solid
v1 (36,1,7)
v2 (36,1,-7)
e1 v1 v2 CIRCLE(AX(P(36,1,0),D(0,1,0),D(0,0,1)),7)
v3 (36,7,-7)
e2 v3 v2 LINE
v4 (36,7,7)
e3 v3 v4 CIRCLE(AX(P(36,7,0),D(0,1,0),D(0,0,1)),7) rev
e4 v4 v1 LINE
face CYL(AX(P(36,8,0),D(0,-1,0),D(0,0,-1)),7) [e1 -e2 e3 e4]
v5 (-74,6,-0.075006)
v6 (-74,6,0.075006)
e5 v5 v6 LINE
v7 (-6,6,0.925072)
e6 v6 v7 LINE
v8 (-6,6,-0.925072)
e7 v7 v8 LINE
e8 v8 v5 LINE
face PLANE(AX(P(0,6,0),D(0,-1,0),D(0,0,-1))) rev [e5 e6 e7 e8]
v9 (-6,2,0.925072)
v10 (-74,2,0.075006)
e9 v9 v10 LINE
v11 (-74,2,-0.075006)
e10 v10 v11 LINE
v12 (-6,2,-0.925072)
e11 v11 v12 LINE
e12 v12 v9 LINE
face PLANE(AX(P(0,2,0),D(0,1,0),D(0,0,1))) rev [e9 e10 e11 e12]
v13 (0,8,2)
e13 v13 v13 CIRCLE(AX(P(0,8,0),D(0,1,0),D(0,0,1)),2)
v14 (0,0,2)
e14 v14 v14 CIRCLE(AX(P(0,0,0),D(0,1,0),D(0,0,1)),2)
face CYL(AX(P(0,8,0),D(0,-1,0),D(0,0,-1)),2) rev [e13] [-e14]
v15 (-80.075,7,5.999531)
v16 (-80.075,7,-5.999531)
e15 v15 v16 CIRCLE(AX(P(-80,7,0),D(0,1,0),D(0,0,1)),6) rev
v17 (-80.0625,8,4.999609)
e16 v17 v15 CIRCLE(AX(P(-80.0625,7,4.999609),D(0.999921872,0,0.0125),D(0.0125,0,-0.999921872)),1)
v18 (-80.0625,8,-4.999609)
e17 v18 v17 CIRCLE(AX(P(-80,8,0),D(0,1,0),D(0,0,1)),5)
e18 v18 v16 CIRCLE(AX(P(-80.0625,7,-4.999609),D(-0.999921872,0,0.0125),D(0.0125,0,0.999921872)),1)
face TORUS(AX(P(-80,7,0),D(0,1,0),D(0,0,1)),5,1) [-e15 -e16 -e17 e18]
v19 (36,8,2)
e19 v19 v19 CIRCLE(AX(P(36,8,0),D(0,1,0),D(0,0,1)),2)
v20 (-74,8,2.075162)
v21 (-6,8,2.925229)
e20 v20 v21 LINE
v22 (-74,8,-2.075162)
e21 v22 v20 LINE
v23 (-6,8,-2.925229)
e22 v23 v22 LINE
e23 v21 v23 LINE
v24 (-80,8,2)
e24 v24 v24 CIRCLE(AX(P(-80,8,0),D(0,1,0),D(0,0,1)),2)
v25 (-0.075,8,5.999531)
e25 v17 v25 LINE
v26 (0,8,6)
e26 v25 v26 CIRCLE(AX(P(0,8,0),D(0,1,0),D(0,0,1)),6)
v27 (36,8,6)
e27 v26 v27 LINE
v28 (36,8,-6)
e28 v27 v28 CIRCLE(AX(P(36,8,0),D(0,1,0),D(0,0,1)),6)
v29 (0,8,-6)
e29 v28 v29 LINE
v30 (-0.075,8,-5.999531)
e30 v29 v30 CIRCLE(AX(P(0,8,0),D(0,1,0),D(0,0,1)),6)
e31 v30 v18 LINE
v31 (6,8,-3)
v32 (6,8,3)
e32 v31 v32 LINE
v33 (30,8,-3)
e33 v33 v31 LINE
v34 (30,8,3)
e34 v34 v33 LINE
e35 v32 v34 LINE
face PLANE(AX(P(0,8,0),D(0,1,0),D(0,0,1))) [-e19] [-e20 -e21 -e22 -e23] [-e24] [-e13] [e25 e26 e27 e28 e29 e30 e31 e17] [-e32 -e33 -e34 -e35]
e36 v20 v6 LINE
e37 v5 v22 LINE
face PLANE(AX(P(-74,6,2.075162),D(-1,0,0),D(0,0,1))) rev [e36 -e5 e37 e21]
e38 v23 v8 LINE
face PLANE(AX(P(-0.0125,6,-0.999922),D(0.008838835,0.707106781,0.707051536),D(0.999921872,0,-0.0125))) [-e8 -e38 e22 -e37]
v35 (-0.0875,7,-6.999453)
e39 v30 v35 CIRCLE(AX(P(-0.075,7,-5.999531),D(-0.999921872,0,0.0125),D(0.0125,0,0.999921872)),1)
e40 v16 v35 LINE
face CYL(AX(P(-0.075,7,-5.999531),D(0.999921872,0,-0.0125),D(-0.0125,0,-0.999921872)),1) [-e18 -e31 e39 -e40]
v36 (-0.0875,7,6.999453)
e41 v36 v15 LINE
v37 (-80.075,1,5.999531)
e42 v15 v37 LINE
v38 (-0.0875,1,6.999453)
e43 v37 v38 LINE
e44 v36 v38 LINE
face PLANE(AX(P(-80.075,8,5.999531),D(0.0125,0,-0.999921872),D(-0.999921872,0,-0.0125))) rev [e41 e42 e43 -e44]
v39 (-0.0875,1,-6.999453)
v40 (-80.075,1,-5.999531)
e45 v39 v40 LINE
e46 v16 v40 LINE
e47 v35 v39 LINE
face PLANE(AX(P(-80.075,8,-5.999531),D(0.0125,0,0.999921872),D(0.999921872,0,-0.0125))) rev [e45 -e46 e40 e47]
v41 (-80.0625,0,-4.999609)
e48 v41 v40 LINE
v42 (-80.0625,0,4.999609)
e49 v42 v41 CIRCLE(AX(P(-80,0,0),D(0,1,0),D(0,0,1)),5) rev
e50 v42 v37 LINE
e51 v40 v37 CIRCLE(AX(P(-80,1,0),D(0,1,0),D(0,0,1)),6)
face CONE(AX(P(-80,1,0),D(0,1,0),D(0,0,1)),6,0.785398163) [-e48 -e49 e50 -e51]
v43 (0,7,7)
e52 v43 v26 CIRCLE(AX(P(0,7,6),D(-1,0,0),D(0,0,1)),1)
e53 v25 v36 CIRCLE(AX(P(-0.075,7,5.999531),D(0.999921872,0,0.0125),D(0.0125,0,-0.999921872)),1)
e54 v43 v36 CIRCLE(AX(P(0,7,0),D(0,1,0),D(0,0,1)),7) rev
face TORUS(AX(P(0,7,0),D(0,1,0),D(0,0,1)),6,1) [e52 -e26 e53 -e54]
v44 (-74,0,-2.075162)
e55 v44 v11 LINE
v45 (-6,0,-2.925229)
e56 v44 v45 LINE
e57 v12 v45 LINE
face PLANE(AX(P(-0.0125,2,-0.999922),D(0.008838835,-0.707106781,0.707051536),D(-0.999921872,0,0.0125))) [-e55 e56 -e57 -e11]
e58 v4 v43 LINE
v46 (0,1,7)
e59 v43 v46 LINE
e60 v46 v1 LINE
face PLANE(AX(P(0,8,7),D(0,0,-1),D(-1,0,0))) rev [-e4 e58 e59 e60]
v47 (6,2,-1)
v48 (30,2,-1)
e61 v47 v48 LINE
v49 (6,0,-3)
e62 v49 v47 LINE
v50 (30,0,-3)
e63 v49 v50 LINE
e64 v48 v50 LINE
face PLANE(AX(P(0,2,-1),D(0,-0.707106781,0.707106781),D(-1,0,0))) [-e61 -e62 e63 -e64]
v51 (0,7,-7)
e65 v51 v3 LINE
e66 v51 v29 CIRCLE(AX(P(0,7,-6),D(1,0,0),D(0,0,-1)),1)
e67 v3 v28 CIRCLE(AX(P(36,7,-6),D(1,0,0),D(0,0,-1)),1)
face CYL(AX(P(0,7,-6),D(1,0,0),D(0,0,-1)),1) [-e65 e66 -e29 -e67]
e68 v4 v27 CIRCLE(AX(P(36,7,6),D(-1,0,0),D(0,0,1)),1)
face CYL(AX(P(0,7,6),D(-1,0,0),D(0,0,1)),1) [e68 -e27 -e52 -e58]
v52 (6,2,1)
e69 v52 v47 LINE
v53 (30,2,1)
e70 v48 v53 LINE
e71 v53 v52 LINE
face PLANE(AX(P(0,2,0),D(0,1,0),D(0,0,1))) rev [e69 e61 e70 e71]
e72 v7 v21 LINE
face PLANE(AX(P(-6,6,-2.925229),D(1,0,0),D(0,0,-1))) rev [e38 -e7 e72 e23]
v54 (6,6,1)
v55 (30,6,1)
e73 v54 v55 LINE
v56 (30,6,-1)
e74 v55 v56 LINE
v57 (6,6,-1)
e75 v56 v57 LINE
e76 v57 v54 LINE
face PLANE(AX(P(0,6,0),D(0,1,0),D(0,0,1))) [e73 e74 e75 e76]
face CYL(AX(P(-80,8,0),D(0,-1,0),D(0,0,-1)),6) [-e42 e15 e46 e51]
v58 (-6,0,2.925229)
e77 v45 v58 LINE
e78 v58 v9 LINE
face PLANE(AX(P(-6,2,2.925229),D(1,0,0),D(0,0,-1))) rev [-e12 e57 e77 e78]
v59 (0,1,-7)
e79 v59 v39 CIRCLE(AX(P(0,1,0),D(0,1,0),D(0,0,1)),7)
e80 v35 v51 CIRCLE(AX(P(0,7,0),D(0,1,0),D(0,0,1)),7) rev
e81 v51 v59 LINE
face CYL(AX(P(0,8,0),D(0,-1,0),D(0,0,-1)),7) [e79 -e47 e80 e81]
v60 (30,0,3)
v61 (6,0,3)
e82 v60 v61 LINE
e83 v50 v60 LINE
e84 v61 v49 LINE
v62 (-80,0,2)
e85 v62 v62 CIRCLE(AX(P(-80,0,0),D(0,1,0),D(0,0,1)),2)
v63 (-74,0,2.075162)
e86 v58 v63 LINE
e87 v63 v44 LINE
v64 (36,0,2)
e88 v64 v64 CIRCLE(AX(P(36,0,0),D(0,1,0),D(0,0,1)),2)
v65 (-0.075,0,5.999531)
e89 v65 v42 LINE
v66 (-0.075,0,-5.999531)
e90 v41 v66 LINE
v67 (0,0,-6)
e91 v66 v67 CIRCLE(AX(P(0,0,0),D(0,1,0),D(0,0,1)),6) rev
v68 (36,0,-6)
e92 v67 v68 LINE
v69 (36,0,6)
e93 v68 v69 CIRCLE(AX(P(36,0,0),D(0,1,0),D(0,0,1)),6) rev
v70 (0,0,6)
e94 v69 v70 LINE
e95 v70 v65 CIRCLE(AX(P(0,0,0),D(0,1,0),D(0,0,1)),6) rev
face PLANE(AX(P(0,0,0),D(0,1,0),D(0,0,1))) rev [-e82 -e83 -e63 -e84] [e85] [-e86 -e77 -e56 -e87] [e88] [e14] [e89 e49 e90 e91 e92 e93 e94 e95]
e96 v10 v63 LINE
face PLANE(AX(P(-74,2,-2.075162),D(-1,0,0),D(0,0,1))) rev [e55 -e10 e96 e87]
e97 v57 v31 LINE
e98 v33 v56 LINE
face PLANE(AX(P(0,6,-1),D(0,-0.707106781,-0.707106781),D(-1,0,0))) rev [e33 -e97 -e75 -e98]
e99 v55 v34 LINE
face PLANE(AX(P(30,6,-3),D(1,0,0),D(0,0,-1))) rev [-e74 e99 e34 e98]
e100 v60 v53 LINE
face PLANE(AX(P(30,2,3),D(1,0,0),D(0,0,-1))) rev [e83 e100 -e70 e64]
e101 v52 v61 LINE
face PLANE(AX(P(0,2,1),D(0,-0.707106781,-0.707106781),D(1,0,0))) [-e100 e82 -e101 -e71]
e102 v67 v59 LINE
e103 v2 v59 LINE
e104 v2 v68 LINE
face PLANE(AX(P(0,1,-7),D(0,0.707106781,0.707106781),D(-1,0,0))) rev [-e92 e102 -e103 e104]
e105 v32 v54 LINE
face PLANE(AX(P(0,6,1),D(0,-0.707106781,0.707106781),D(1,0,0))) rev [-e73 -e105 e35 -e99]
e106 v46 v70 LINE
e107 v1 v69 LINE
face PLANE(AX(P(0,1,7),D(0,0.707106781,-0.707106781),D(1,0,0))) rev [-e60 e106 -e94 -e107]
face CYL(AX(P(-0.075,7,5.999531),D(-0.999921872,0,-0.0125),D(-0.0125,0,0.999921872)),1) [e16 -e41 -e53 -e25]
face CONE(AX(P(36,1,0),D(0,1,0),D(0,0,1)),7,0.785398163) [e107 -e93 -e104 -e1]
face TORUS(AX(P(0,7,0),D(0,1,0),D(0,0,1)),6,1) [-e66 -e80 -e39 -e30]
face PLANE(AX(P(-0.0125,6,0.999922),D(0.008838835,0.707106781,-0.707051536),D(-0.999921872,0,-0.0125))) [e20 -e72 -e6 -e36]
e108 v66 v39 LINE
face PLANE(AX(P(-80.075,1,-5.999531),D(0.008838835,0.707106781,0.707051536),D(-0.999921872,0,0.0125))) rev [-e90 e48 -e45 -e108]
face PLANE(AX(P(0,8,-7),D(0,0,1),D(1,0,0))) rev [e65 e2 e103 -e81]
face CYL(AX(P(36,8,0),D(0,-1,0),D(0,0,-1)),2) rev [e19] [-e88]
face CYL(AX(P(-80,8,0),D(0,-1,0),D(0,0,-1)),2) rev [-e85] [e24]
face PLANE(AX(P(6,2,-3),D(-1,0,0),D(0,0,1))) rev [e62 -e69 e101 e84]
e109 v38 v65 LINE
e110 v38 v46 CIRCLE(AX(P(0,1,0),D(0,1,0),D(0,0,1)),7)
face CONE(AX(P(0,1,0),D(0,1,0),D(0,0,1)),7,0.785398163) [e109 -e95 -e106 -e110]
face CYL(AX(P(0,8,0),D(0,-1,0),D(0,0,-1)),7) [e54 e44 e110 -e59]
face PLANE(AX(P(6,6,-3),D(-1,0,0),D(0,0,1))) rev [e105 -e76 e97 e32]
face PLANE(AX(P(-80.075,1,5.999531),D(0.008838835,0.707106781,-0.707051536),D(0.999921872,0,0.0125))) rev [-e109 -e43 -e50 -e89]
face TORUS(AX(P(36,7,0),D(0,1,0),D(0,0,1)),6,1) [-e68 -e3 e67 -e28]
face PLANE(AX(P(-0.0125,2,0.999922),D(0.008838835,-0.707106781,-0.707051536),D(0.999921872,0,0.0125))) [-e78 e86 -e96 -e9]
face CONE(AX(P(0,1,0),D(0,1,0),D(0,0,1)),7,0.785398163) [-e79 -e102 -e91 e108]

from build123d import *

# Parameters (mm, degrees)
SKETCH1_R           = 2
BOSS_EXTRUDE1_DEPTH = 8
SKETCH2_W           = 24
SKETCH2_H           = 6
CUT_EXTRUDE1_DEPTH  = 2
SKETCH3_W           = 24
SKETCH3_H           = 6
CUT_EXTRUDE2_DEPTH  = 2
FILLET2_R           = 1
CHAMFER1_SIZE       = 1
CHAMFER2_SIZE       = 2
CHAMFER3_SIZE       = 2
CHAMFER5_SIZE       = 2
CHAMFER6_SIZE       = 2
CHAMFER7_SIZE       = 2
CHAMFER8_SIZE       = 2
CHAMFER9_SIZE       = 2
CHAMFER10_SIZE      = 2


with BuildPart() as part:
    # Sketch1 → Boss-Extrude1 (new body)
    with BuildSketch(Plane(origin=(0, 0, 0), x_dir=(1, 0, 0), z_dir=(0, 1, 0))):
        with BuildLine():
            Line((0, 7), (36, 7))
            ThreePointArc((36, 7), (43, 0), (36, -7))
            Line((36, -7), (0, -7))
            ThreePointArc((0, -7), (-0.043750855, -6.999863275), (-0.0875, -6.999453104))
            Line((-0.0875, -6.999453104), (-80.075, -5.999531232))
            ThreePointArc((-80.075, -5.999531232), (-86, 0), (-80.075, 5.999531232))
            Line((-80.075, 5.999531232), (-0.0875, 6.999453104))
            ThreePointArc((-0.0875, 6.999453104), (-0.043750855, 6.999863275), (0, 7))
        make_face()
        with Locations(Location((0, 0, 0), (0, 0, 270))):
            Circle(SKETCH1_R, mode=Mode.SUBTRACT)
        with Locations(Location((-80, 0, 0), (0, 0, 270))):
            Circle(SKETCH1_R, mode=Mode.SUBTRACT)
        with Locations(Location((36, 0, 0), (0, 0, 270))):
            Circle(SKETCH1_R, mode=Mode.SUBTRACT)
    extrude(amount=BOSS_EXTRUDE1_DEPTH)

    # Sketch2 → Cut-Extrude1 (cut)
    with BuildSketch(Plane(origin=(0, 8, 0), x_dir=(1, 0, 0), z_dir=(0, 1, 0))):
        Polygon((-74, 2.075162128), (-6, 2.925228542), (-6, -2.925228542), (-74, -2.075162128), align=None)
        with Locations((18, 0)):
            Rectangle(SKETCH2_W, SKETCH2_H)
    extrude(amount=-CUT_EXTRUDE1_DEPTH, mode=Mode.SUBTRACT)

    # Sketch3 → Cut-Extrude2 (cut)
    with BuildSketch(Plane.XZ):
        Polygon((-74, 2.075162128), (-6, 2.925228542), (-6, -2.925228542), (-74, -2.075162128), align=None)
        with Locations((18, 0)):
            Rectangle(SKETCH3_W, SKETCH3_H)
    extrude(amount=-CUT_EXTRUDE2_DEPTH, mode=Mode.SUBTRACT)

    # Fillet2
    fillet2_edges = [part.edges().sort_by_distance(p)[0] for p in [
        (-86, 8, 0),
        (-40.08125, 8, 6.499492168),
        (-0.043750855, 8, 6.999863275),
        (18, 8, 7),
        (43, 8, 0),
        (18, 8, -7),
        (-0.043750855, 8, -6.999863275),
        (-40.08125, 8, -6.499492168),
    ]]
    fillet(fillet2_edges, radius=FILLET2_R)

    # Chamfer1
    chamfer1_edges = [part.edges().sort_by_distance(p)[0] for p in [
        (-40.08125, 0, 6.499492168),
        (-86, 0, 0),
        (-40.08125, 0, -6.499492168),
        (-0.043750855, 0, -6.999863275),
        (18, 0, -7),
        (43, 0, 0),
        (18, 0, 7),
        (-0.043750855, 0, 6.999863275),
    ]]
    chamfer(chamfer1_edges, length=CHAMFER1_SIZE)

    # Chamfer2
    chamfer2_edges = [part.edges().sort_by_distance(p)[0] for p in [
        (18, 2, -3),
    ]]
    chamfer(chamfer2_edges, length=CHAMFER2_SIZE - 0.0001)  # a hair under: the kernel refuses the full size

    # Chamfer3
    chamfer3_edges = [part.edges().sort_by_distance(p)[0] for p in [
        (18, 2, 3),
    ]]
    chamfer(chamfer3_edges, length=CHAMFER3_SIZE - 0.0001)  # a hair under: the kernel refuses the full size

    # Chamfer5
    chamfer5_edges = [part.edges().sort_by_distance(p)[0] for p in [
        (-40, 2, -2.500195335),
    ]]
    chamfer(chamfer5_edges, length=CHAMFER5_SIZE - 0.0001)  # a hair under: the kernel refuses the full size

    # Chamfer6
    chamfer6_edges = [part.edges().sort_by_distance(p)[0] for p in [
        (-40, 2, 2.500195335),
    ]]
    chamfer(chamfer6_edges, length=CHAMFER6_SIZE - 0.0001)  # a hair under: the kernel refuses the full size

    # Chamfer7
    chamfer7_edges = [part.edges().sort_by_distance(p)[0] for p in [
        (-40, 6, -2.500195335),
    ]]
    chamfer(chamfer7_edges, length=CHAMFER7_SIZE - 0.0001)  # a hair under: the kernel refuses the full size

    # Chamfer8
    chamfer8_edges = [part.edges().sort_by_distance(p)[0] for p in [
        (18, 6, -3),
    ]]
    chamfer(chamfer8_edges, length=CHAMFER8_SIZE - 0.0001)  # a hair under: the kernel refuses the full size

    # Chamfer9
    chamfer9_edges = [part.edges().sort_by_distance(p)[0] for p in [
        (18, 6, 3),
    ]]
    chamfer(chamfer9_edges, length=CHAMFER9_SIZE - 0.0001)  # a hair under: the kernel refuses the full size

    # Chamfer10
    chamfer10_edges = [part.edges().sort_by_distance(p)[0] for p in [
        (-40, 6, 2.500195335),
    ]]
    chamfer(chamfer10_edges, length=CHAMFER10_SIZE - 0.0001)  # a hair under: the kernel refuses the full size


solid = part.part
